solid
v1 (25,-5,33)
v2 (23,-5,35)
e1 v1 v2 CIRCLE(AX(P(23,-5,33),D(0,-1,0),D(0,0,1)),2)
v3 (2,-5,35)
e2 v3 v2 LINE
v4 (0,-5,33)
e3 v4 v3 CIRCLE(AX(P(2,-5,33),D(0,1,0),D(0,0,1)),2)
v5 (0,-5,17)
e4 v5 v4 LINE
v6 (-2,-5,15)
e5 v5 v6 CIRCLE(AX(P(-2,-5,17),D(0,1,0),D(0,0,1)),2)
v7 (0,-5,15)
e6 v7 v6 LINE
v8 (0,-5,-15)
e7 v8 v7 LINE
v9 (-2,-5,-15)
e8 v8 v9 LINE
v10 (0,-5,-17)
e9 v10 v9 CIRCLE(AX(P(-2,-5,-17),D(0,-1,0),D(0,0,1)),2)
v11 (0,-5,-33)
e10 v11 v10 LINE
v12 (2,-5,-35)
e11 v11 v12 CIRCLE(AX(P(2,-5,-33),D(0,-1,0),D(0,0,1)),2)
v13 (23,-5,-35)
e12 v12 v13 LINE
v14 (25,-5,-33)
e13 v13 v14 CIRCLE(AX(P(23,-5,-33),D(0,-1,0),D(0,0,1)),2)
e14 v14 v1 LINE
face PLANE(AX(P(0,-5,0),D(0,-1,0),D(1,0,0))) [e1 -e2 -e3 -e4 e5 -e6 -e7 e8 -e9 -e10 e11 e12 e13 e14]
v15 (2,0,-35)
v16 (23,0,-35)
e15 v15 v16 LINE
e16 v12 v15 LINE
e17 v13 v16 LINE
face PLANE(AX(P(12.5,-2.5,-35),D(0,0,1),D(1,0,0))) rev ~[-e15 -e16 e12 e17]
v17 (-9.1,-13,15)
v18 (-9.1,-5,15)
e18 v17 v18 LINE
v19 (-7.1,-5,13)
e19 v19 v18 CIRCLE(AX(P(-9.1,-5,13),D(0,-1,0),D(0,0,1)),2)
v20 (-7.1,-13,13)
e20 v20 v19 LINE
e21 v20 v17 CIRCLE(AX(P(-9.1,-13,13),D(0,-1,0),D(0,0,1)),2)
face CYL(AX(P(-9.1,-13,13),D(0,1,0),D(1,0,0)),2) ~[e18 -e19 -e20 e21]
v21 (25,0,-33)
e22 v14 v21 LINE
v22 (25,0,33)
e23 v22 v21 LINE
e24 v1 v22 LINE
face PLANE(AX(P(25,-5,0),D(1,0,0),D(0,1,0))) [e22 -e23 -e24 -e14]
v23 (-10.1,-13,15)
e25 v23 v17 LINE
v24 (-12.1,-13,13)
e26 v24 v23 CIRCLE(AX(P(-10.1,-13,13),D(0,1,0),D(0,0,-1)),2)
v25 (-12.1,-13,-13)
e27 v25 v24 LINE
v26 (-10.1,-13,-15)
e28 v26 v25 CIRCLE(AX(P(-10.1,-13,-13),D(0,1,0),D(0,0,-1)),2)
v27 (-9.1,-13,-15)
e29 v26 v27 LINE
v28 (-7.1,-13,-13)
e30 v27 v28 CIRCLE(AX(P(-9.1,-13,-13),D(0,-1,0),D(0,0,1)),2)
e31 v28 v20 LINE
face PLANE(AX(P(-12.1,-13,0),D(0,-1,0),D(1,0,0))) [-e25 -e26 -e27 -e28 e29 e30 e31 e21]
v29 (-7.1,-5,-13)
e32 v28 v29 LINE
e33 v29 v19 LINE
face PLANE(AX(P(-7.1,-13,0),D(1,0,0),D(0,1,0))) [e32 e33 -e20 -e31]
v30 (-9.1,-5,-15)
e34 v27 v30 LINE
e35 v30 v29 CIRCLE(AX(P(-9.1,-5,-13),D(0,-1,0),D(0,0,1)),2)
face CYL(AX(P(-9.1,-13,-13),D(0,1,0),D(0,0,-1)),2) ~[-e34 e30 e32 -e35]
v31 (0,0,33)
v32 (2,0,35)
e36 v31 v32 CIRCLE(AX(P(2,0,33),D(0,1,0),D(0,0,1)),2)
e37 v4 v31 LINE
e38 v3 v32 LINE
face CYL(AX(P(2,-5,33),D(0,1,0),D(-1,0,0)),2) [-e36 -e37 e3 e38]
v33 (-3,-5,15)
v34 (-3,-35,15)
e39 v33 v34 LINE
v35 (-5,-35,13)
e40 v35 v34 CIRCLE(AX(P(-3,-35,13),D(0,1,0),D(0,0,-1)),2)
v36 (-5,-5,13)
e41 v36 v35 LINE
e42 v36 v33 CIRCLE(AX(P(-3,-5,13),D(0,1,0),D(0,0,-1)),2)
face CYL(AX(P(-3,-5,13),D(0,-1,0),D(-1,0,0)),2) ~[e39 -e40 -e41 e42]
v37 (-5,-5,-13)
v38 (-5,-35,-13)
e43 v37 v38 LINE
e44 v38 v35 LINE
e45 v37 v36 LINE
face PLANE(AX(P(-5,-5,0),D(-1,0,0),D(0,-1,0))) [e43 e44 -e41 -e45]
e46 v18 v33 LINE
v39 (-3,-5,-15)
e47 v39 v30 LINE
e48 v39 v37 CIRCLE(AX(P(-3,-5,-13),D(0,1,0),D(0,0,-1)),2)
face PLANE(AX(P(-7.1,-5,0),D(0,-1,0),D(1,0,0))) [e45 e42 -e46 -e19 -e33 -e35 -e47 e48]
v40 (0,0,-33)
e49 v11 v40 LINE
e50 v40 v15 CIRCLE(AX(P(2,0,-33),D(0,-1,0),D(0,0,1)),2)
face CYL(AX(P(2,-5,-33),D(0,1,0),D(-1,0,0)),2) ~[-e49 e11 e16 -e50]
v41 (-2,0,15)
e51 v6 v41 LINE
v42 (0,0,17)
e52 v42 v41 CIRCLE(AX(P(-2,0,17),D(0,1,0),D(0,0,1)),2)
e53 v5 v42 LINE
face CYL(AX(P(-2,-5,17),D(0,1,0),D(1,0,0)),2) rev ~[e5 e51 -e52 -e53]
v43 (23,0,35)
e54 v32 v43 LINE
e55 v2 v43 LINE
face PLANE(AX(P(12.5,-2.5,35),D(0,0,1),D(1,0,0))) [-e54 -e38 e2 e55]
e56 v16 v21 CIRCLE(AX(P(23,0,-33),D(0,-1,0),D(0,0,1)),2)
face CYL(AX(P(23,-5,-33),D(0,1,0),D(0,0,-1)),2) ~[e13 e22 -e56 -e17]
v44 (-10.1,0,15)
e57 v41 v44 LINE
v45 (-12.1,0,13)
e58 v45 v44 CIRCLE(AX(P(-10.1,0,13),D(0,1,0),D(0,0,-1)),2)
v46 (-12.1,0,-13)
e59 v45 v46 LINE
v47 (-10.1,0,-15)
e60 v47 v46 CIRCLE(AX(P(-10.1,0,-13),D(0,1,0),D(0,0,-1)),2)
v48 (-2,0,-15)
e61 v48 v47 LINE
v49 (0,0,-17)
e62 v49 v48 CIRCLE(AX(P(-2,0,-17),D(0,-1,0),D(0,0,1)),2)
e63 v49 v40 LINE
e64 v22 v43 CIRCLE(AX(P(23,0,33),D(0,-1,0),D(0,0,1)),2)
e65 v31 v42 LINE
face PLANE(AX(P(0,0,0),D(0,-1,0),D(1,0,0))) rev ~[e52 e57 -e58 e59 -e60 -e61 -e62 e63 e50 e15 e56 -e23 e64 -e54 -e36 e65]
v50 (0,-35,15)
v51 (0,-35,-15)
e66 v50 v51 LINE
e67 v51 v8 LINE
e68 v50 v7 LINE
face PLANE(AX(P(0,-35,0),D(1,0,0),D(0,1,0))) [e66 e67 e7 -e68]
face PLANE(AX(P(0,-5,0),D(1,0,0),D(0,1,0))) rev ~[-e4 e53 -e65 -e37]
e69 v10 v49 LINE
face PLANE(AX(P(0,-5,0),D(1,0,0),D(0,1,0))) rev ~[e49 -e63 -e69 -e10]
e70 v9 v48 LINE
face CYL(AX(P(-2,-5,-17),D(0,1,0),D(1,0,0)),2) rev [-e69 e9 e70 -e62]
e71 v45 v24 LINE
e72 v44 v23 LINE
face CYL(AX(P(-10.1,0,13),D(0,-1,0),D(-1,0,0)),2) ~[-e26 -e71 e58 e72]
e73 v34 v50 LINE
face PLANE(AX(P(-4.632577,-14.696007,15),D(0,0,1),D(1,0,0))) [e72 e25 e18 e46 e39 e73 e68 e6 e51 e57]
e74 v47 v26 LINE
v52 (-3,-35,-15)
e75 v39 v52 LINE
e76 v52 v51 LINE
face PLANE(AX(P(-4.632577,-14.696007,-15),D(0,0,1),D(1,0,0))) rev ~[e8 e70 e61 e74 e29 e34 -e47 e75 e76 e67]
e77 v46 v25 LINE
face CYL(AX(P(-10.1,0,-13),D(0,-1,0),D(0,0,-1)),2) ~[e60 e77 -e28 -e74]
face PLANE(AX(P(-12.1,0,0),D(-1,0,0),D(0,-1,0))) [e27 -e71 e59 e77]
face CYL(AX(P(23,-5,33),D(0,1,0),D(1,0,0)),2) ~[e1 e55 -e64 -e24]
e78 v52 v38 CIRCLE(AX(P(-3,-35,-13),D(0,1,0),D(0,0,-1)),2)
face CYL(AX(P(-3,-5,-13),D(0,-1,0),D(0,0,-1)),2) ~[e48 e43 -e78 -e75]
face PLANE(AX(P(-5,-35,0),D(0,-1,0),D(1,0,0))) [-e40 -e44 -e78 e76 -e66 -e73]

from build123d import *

# Parameters (mm, degrees)
F1_DEPTH = 15
F0_W     = 25
F0_H     = 5
F2_DEPTH = 35
F3_R     = 2


with BuildPart() as f1:
    # F0 (on Top) → F1 (new body, symmetric)
    with BuildSketch(Plane.XY):
        Polygon((-12.1, 0), (-12.1, -13), (-7.1, -13), (-7.1, -5), (-5, -5), (-5, -35), (0, -35), (0, -5), (0, 0), align=None)
    extrude(amount=F1_DEPTH, both=True)

    # F0 (on Top) → F2 (join, symmetric)
    with BuildSketch(Plane.XY):
        with Locations((12.5, -2.5)):
            Rectangle(F0_W, F0_H)
    extrude(amount=F2_DEPTH, both=True)

    # F3
    f3_edges = [f1.edges().sort_by_distance(p)[0] for p in [
        (0, -2.5, 15),
        (0, -2.5, -15),
        (0, -2.5, -35),
        (0, -2.5, 35),
        (25, -2.5, 35),
        (25, -2.5, -35),
        (-12.1, -6.5, 15),
        (-5, -20, 15),
        (-7.1, -9, 15),
        (-5, -20, -15),
        (-12.1, -6.5, -15),
        (-7.1, -9, -15),
    ]]
    fillet(f3_edges, radius=F3_R)


solid = f1.part
